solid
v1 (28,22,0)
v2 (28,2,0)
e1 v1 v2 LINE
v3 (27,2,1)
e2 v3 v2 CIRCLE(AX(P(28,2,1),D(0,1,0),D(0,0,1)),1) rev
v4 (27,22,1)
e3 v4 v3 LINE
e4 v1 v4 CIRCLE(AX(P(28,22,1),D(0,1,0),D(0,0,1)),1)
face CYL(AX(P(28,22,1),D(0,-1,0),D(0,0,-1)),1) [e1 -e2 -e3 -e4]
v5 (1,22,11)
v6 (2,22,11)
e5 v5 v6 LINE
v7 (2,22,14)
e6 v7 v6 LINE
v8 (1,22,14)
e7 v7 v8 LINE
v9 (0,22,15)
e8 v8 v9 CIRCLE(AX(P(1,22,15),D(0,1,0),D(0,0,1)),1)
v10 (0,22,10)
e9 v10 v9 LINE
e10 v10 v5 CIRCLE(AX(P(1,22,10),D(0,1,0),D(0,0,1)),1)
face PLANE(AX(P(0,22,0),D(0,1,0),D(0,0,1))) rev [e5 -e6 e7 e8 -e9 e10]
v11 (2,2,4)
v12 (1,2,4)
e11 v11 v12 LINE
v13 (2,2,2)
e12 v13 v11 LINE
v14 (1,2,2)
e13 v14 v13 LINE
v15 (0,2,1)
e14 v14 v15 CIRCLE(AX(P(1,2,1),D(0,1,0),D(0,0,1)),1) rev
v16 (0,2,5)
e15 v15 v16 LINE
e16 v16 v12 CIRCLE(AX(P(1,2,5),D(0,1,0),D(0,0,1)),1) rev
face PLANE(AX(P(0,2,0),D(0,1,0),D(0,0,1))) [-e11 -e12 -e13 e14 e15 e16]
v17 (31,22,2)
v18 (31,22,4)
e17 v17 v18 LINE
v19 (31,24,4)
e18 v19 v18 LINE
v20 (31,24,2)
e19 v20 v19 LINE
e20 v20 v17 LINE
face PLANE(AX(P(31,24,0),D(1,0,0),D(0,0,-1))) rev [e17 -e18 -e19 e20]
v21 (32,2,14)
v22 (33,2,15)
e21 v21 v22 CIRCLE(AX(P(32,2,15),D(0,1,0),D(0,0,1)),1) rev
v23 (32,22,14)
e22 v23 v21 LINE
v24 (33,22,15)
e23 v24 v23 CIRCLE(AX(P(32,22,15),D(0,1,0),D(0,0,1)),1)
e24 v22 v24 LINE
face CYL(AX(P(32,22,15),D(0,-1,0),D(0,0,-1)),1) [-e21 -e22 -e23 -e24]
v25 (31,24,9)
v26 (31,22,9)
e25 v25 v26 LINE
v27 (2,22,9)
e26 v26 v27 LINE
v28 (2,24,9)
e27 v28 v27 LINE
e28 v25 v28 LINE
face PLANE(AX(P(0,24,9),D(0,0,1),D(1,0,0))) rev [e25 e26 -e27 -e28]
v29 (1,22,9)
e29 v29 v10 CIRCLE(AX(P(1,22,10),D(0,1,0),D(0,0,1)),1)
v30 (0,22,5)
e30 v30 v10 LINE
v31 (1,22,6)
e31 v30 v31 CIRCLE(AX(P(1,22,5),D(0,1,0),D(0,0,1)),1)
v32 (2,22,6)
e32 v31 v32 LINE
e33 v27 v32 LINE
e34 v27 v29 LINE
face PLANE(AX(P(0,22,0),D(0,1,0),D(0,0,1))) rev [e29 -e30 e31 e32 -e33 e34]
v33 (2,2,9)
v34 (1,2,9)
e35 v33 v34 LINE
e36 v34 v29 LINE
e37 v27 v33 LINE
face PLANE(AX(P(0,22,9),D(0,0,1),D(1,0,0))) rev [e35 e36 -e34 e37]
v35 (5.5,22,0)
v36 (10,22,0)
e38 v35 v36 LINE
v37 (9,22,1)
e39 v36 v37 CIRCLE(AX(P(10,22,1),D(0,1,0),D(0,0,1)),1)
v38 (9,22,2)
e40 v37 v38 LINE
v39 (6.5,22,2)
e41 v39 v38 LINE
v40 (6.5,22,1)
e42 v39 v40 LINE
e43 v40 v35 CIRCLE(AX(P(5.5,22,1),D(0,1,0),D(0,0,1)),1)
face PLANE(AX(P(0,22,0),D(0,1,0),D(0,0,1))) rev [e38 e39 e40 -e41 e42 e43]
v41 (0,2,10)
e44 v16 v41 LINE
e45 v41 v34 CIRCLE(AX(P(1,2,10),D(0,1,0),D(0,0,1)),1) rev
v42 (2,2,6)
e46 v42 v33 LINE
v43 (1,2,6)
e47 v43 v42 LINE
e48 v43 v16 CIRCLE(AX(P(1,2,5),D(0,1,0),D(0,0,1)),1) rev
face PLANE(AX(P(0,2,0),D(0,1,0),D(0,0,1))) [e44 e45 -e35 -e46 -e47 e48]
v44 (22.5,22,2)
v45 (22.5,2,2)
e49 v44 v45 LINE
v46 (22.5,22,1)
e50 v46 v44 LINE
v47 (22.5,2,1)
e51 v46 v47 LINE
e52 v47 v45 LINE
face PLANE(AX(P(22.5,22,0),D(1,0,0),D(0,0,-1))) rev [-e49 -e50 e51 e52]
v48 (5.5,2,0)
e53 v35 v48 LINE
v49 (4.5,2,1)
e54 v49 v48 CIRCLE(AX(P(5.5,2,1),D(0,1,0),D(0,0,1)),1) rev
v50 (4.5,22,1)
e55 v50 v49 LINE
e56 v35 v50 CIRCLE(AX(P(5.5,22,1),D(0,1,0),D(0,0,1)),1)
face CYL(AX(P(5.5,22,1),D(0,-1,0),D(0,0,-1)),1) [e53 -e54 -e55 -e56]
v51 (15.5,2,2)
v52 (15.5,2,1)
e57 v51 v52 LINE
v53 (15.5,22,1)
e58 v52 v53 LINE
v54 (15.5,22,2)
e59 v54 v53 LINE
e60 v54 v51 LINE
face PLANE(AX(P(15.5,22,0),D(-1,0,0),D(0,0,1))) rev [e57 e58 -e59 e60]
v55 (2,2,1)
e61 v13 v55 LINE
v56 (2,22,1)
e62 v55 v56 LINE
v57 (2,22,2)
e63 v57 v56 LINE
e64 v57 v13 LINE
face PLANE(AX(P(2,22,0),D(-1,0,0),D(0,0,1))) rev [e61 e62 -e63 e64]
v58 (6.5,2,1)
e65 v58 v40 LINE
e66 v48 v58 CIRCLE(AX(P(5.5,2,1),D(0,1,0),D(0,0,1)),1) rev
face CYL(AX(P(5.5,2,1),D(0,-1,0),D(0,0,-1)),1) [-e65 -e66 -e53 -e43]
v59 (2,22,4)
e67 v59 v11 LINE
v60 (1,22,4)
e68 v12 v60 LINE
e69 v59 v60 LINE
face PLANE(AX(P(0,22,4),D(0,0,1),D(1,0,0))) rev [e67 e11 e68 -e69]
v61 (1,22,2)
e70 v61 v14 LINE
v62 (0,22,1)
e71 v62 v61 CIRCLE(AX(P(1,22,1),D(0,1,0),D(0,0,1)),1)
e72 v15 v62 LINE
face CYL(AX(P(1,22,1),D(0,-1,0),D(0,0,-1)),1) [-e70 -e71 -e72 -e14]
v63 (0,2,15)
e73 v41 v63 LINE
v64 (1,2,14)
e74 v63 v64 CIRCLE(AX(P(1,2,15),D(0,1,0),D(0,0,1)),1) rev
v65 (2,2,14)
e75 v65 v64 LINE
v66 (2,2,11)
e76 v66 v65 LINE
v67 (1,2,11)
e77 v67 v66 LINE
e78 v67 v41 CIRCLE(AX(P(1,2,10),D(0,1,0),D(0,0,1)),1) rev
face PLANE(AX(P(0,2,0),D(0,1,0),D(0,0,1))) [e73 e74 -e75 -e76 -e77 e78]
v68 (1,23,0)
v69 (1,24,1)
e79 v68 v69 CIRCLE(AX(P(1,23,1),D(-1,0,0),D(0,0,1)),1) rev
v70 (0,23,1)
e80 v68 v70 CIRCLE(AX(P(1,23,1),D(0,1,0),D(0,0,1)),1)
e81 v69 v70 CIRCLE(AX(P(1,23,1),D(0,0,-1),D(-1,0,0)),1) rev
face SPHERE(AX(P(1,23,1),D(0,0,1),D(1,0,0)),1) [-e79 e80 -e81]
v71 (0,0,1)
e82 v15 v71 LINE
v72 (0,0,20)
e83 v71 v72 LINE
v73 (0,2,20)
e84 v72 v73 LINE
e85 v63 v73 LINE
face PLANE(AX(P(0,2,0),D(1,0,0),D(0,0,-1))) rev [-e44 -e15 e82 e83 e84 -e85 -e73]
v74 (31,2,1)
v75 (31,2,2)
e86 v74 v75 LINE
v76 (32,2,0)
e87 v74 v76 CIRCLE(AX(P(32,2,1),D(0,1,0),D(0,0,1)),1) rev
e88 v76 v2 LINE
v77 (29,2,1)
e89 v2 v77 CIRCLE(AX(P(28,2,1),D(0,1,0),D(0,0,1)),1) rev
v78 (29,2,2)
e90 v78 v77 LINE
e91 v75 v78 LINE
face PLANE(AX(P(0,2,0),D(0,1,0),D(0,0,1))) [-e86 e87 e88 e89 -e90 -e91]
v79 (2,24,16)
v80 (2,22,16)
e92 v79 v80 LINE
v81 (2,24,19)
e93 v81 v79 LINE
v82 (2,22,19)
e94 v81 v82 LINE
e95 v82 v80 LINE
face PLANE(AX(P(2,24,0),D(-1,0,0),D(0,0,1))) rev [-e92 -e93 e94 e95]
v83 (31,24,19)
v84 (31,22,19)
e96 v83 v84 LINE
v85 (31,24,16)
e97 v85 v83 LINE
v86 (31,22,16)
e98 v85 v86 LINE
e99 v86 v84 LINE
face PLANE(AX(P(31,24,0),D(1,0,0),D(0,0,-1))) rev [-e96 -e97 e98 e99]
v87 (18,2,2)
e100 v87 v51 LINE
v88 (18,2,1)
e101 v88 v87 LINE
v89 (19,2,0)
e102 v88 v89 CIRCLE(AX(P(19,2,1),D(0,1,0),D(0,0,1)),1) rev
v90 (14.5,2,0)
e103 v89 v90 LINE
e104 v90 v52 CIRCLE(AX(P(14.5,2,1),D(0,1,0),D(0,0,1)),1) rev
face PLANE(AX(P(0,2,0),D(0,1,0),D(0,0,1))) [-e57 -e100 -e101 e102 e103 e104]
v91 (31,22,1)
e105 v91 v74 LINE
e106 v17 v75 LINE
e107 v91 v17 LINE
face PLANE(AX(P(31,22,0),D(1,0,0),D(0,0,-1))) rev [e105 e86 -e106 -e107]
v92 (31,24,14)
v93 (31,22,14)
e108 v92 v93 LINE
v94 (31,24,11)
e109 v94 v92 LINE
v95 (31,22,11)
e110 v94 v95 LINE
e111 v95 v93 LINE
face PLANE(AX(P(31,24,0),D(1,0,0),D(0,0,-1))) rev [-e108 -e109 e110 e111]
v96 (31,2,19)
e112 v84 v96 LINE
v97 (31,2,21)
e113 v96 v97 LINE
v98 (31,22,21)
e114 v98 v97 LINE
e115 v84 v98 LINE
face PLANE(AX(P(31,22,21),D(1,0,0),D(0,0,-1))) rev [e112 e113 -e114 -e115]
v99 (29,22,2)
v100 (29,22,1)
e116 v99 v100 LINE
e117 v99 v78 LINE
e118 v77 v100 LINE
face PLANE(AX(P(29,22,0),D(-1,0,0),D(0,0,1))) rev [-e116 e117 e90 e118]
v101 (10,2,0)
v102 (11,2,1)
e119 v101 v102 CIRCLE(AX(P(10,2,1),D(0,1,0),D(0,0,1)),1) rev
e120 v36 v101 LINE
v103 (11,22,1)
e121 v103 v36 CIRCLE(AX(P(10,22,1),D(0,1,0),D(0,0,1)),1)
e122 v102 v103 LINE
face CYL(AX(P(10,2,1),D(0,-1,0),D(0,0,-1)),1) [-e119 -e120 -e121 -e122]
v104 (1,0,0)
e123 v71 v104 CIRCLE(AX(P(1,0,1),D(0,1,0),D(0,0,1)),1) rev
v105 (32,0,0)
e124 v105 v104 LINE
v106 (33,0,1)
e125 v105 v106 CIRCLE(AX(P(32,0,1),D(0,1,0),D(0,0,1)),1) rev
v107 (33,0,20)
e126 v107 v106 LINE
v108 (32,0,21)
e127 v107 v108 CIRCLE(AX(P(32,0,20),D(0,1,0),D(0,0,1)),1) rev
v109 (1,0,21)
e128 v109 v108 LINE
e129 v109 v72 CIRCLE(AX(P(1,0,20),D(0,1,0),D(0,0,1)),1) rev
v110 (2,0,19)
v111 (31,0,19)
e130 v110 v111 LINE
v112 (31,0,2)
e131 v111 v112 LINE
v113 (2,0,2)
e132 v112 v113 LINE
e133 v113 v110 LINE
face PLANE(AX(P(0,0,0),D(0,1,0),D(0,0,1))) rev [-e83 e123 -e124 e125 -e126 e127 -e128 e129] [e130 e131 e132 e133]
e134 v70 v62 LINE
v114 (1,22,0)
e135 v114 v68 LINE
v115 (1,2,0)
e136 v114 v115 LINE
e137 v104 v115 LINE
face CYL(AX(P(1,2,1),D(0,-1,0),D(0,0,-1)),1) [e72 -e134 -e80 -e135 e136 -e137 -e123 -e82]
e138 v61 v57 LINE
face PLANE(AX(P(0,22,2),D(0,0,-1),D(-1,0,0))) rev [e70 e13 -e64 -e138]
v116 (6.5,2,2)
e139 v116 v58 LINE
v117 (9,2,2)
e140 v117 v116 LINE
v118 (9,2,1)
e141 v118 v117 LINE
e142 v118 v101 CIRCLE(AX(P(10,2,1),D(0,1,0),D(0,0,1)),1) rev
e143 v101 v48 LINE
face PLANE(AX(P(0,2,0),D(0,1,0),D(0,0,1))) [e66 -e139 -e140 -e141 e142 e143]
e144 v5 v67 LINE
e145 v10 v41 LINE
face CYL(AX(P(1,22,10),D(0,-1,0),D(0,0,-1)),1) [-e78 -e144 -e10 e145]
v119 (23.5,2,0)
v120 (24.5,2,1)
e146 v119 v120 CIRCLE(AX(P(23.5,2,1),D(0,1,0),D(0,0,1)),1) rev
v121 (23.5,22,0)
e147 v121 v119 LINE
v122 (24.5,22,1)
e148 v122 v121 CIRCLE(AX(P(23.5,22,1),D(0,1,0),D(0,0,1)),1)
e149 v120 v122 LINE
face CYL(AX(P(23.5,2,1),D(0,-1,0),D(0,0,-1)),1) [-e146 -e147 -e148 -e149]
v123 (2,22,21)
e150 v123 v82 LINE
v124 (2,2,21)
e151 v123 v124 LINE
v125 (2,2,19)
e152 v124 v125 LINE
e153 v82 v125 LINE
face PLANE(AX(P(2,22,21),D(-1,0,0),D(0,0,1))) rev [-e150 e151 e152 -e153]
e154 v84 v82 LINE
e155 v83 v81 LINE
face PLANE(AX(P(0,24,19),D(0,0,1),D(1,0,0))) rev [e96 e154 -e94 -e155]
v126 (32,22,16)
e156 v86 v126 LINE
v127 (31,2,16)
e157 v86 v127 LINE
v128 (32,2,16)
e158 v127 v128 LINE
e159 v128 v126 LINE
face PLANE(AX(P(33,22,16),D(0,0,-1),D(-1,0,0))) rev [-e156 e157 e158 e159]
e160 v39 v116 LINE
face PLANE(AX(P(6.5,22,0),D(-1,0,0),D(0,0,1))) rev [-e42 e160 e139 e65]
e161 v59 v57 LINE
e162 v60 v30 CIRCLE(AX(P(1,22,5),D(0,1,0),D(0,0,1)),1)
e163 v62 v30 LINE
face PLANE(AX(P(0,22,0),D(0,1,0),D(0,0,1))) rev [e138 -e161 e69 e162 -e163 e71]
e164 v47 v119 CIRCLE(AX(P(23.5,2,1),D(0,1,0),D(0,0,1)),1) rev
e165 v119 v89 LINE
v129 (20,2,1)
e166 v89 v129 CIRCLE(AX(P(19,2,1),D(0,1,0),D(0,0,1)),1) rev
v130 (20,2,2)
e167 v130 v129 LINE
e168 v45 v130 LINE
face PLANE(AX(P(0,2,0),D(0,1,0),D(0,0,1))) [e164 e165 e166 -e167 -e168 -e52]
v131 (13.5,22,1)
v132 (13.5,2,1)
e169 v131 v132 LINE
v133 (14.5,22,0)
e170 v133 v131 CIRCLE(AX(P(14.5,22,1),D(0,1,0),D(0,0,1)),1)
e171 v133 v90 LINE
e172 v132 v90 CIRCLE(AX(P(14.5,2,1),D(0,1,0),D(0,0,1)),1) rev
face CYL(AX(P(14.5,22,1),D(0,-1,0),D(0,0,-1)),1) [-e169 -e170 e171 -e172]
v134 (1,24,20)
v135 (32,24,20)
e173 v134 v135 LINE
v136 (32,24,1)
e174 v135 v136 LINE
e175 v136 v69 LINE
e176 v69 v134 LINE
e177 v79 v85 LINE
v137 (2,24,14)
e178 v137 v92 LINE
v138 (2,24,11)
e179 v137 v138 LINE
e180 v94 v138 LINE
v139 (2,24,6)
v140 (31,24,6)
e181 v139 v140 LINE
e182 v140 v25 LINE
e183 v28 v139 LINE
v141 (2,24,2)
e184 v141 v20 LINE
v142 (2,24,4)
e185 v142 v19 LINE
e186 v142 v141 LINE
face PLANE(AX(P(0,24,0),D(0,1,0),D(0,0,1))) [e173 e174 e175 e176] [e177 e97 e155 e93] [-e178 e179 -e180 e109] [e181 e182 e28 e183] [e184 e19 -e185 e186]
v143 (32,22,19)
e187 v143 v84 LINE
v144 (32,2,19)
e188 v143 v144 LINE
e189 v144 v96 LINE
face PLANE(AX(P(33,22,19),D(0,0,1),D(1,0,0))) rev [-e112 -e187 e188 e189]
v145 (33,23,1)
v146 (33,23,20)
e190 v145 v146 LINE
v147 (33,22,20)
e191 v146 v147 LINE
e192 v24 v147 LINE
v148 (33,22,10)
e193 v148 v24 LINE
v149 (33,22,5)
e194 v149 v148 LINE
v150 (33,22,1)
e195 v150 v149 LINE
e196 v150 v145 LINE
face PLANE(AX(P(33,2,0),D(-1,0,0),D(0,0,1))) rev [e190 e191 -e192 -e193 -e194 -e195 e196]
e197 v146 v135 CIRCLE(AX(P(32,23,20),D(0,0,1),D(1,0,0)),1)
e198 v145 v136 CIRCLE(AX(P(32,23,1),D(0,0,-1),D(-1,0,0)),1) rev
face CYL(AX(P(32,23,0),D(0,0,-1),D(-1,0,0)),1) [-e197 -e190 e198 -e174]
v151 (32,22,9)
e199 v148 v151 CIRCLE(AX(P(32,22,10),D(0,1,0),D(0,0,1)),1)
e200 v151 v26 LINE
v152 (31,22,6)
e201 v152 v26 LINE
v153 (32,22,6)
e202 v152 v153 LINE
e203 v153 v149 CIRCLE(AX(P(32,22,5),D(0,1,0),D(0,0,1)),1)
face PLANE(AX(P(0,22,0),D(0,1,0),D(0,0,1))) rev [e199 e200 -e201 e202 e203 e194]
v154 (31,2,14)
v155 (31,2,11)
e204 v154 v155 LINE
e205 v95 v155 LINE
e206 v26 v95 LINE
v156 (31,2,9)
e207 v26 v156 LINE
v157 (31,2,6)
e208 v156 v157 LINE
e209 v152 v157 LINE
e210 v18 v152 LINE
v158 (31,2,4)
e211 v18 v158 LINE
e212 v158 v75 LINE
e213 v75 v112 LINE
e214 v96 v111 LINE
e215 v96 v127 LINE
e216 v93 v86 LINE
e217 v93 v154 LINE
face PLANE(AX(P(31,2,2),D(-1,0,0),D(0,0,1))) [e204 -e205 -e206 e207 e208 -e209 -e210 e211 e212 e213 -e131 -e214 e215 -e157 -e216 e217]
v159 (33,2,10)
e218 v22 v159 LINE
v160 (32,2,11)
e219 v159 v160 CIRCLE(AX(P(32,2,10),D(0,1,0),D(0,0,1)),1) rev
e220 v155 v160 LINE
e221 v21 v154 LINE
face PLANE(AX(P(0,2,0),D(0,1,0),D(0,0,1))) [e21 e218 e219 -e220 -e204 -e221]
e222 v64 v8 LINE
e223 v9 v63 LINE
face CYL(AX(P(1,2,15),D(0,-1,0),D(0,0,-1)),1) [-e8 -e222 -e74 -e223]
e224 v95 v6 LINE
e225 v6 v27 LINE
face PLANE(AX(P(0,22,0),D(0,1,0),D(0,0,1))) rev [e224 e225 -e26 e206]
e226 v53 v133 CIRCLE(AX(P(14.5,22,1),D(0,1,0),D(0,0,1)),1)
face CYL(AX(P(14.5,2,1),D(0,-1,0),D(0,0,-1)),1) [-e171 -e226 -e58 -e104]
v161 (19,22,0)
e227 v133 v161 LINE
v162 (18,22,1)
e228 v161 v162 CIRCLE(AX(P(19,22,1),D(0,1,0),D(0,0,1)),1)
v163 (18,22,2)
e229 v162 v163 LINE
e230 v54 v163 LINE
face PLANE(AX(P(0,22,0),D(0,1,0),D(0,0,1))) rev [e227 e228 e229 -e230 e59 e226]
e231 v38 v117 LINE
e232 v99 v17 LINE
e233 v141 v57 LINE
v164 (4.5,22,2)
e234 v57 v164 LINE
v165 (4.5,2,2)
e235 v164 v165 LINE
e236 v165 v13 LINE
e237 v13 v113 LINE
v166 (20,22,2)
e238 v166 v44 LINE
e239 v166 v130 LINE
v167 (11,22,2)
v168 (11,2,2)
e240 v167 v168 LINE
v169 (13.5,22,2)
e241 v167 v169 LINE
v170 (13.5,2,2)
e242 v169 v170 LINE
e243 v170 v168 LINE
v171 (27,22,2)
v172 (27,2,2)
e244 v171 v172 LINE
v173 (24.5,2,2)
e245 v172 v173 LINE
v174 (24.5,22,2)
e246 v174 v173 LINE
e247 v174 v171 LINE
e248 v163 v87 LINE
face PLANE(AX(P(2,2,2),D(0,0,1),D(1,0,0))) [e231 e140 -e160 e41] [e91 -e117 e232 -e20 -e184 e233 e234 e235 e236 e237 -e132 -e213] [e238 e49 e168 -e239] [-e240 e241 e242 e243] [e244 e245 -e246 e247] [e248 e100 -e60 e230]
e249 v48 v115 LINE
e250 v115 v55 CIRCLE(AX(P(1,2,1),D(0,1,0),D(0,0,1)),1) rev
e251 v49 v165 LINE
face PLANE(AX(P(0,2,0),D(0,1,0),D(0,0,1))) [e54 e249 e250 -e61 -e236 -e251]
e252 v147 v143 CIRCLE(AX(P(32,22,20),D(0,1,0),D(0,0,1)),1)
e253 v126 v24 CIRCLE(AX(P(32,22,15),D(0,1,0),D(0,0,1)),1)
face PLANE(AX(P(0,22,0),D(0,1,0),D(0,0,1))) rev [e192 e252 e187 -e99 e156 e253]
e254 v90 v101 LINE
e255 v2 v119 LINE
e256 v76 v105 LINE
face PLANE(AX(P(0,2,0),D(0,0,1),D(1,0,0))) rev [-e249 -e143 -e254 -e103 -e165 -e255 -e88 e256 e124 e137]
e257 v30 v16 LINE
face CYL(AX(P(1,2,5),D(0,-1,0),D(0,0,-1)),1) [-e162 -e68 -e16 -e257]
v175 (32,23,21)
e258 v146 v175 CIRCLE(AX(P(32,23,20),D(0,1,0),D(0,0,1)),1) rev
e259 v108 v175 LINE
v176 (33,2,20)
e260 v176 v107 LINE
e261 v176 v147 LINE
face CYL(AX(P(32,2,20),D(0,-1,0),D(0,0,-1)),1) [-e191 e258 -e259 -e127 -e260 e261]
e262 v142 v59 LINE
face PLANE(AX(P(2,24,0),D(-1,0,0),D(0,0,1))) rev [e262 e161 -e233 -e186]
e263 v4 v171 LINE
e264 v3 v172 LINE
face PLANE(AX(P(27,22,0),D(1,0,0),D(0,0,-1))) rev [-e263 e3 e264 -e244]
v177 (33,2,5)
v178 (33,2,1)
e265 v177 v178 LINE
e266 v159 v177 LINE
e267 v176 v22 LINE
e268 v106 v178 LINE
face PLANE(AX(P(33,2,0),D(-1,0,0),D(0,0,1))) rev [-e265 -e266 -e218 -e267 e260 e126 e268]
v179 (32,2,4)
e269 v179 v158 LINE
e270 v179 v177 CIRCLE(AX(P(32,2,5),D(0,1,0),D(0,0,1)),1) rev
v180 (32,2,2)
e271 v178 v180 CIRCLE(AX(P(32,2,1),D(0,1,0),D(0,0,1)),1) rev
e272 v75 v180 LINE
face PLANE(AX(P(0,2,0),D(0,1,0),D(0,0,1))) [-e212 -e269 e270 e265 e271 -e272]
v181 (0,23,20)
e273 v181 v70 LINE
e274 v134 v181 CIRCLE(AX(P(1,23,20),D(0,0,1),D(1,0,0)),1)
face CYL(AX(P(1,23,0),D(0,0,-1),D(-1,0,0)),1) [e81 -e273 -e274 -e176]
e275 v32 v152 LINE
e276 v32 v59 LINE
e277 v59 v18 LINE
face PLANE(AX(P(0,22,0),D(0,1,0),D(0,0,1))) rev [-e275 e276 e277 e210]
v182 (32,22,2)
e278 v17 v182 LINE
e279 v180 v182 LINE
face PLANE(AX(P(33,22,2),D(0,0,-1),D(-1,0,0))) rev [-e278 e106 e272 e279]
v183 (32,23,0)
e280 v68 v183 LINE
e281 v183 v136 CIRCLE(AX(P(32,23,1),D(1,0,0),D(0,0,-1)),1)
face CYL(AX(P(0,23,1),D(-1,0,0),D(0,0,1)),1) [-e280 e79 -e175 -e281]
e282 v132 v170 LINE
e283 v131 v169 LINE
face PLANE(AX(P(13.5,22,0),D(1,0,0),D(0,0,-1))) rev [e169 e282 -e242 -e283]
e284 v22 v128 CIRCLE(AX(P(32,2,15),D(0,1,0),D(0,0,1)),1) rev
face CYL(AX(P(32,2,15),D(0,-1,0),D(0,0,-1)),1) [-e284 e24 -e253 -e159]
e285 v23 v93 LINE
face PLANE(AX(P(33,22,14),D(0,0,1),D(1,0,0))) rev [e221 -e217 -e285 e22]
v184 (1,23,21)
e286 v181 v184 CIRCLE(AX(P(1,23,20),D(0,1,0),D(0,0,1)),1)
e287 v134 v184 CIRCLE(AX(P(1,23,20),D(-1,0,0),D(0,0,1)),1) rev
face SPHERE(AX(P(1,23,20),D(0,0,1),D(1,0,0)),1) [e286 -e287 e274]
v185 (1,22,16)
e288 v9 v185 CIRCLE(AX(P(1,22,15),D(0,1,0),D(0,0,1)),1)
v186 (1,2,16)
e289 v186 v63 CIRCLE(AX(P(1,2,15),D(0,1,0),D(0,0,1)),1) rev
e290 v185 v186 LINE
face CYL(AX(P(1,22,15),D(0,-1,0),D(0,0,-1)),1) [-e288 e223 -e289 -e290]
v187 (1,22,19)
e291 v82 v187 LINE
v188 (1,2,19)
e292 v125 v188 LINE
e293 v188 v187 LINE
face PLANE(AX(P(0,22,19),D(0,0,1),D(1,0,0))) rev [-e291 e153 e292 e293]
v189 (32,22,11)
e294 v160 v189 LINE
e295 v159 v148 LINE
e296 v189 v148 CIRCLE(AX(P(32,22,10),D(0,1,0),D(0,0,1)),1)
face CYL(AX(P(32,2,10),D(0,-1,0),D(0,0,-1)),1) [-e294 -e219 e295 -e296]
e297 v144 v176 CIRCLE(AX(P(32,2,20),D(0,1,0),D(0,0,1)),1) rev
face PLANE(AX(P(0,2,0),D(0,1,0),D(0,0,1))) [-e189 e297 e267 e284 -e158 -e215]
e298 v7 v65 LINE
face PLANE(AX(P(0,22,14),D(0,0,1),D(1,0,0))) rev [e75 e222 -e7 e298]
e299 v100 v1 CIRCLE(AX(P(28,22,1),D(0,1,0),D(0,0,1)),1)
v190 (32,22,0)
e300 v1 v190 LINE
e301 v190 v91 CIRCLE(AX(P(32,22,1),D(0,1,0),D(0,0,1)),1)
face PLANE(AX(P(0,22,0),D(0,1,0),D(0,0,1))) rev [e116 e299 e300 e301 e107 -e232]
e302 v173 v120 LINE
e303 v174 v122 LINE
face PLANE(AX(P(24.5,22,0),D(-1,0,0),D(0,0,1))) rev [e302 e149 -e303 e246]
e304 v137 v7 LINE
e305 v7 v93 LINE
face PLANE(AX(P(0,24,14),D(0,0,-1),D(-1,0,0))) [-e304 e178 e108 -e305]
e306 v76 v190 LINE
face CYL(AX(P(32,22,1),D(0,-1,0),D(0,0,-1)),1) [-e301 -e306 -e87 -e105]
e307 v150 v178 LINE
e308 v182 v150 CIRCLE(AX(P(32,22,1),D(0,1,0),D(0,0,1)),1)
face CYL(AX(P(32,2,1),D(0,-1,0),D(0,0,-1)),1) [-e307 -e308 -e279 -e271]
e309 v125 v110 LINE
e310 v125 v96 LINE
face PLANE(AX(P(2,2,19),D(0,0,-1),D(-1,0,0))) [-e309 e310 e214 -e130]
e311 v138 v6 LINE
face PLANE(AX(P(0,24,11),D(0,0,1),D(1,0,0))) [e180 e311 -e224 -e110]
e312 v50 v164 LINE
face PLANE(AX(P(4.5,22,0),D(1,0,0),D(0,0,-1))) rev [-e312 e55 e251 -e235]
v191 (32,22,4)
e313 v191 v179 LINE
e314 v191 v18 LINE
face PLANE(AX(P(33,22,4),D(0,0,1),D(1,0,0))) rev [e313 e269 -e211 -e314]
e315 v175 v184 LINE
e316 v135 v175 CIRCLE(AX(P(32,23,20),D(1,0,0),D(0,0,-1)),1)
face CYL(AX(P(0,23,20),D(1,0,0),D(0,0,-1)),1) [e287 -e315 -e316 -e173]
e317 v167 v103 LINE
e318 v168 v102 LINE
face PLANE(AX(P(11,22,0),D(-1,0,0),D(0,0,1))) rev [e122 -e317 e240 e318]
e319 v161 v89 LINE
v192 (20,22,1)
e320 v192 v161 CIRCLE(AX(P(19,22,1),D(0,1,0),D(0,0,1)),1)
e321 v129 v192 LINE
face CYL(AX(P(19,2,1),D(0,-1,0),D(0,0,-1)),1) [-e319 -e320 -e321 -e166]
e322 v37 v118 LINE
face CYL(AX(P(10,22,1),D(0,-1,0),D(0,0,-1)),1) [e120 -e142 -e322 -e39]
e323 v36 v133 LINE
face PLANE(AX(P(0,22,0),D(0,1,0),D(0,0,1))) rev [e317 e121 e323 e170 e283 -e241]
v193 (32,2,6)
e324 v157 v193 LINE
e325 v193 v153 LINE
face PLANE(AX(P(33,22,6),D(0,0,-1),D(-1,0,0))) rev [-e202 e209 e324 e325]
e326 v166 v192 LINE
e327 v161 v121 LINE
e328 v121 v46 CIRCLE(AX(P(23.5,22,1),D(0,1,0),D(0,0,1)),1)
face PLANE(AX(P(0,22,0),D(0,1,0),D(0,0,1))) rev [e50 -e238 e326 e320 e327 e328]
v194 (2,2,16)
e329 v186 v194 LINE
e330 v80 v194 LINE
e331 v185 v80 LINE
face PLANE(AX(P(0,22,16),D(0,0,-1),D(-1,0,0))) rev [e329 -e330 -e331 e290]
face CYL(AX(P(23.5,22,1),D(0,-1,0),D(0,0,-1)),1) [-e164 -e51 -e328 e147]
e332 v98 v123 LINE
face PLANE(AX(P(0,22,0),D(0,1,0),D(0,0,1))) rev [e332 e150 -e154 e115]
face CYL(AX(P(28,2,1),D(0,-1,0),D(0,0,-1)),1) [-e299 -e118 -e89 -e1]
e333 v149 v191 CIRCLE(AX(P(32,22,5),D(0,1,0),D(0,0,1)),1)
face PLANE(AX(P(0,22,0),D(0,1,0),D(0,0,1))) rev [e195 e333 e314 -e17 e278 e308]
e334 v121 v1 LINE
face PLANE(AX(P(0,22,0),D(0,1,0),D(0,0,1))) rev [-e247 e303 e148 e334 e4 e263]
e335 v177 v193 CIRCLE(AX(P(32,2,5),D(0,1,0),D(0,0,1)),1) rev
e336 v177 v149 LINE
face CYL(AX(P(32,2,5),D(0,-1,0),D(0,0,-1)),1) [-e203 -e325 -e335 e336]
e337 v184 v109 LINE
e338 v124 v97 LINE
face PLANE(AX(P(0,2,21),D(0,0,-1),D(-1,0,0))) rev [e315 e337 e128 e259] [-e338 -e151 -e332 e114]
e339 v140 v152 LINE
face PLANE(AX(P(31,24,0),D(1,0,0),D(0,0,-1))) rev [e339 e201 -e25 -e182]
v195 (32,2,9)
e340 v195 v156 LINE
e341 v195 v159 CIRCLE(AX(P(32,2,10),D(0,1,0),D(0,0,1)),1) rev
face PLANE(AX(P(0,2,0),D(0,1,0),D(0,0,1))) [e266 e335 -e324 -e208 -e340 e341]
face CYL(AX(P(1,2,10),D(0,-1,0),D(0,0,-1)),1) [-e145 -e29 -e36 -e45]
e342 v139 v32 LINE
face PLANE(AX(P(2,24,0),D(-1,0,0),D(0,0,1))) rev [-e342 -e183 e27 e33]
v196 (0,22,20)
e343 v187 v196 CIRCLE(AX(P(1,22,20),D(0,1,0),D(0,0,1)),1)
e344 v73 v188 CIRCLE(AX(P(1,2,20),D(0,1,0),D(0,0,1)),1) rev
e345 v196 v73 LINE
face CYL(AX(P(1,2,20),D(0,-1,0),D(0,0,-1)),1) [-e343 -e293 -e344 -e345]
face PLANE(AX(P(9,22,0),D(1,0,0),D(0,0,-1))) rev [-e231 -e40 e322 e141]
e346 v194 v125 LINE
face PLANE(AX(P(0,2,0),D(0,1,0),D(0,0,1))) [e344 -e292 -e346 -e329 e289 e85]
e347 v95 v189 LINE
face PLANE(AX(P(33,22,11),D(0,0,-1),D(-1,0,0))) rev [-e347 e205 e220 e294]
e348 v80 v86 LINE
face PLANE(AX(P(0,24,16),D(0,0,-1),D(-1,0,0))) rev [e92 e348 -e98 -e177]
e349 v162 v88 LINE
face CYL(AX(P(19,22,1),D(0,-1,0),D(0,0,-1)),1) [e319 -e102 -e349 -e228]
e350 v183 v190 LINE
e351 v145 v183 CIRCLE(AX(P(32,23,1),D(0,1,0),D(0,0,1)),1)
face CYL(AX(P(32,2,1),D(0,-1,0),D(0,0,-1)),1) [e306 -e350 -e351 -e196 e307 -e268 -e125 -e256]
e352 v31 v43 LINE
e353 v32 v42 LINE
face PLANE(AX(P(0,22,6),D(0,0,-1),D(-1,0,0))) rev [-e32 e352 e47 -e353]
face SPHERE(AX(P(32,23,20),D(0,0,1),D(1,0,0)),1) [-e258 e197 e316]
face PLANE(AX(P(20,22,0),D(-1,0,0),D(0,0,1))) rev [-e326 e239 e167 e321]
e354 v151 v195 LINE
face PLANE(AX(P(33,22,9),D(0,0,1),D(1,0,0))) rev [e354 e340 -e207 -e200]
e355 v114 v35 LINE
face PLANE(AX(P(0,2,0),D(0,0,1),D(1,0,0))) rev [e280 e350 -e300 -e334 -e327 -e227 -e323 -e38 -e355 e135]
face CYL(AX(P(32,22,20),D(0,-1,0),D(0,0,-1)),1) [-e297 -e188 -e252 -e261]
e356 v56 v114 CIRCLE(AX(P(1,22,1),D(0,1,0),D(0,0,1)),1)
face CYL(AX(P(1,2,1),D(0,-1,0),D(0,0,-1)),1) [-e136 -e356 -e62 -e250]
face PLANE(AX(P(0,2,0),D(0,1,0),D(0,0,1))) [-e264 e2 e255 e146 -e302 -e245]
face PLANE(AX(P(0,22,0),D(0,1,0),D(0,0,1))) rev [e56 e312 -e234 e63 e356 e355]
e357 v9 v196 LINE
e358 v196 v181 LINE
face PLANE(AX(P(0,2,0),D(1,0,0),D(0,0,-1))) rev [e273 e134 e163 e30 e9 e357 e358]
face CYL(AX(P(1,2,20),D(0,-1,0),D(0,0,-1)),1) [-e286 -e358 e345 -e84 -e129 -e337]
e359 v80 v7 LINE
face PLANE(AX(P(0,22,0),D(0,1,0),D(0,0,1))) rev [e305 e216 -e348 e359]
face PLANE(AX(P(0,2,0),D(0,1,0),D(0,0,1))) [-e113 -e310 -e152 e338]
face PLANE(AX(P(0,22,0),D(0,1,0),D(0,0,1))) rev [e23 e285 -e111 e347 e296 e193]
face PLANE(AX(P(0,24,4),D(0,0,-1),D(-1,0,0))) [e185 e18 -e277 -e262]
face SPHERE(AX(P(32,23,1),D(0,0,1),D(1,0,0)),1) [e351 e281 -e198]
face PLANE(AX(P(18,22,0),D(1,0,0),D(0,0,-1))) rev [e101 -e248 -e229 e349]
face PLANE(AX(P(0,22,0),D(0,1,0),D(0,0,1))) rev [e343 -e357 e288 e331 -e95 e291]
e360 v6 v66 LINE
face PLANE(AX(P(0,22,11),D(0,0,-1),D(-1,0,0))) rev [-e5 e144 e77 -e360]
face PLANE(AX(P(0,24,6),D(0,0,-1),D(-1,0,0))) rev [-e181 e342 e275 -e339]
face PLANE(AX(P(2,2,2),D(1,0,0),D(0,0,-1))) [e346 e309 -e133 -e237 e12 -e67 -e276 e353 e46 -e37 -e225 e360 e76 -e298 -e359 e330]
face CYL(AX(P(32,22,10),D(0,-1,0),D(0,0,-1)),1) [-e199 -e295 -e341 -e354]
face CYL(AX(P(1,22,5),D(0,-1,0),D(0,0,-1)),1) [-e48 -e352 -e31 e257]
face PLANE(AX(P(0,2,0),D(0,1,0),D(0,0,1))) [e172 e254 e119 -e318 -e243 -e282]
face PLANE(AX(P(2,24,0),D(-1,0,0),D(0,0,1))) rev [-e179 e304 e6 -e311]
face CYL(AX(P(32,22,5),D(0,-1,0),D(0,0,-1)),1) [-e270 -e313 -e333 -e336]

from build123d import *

# Parameters (mm, degrees)
SKETCH_1_W      = 33
SKETCH_1_H      = 21
SKETCH_1_W_2    = 29
SKETCH_1_H_2    = 17
EXTRUDE_1_DEPTH = 2
SKETCH_2_W      = 2
SKETCH_2_H      = 2
EXTRUDE_2_DEPTH = 20
SKETCH_3_W      = 33
SKETCH_3_H      = 21
SKETCH_3_W_2    = 29
SKETCH_3_H_2    = 2
SKETCH_3_H_3    = 3
EXTRUDE_6_DEPTH = 2
FILLET_2_R      = 1


with BuildPart() as part:
    # 草图1 → 凸台-拉伸1 (new body)
    with BuildSketch(Plane(origin=(0, 0, 0), x_dir=(1, 0, 0), z_dir=(0, 1, 0))):
        with Locations((16.5, -10.5)):
            Rectangle(SKETCH_1_W, SKETCH_1_H)
        with Locations((16.5, -10.5)):
            Rectangle(SKETCH_1_W_2, SKETCH_1_H_2, mode=Mode.SUBTRACT)
    extrude(amount=EXTRUDE_1_DEPTH)

    # 草图2 → 凸台-拉伸2 (add)
    with BuildSketch(Plane(origin=(0, 2, 0), x_dir=(1, 0, 0), z_dir=(0, 1, 0))):
        with Locations((1, -15)):
            Rectangle(SKETCH_2_W, SKETCH_2_H)
        with Locations((1, -20)):
            Rectangle(SKETCH_2_W, SKETCH_2_H)
        with Locations((1, -1)):
            Rectangle(SKETCH_2_W, SKETCH_2_H)
        with Locations((32, -1)):
            Rectangle(SKETCH_2_W, SKETCH_2_H)
        with Locations((32, -20)):
            Rectangle(SKETCH_2_W, SKETCH_2_H)
        with Locations((32, -15)):
            Rectangle(SKETCH_2_W, SKETCH_2_H)
        with Locations((1, -10)):
            Rectangle(SKETCH_2_W, SKETCH_2_H)
        with Locations((32, -10)):
            Rectangle(SKETCH_2_W, SKETCH_2_H)
        with Locations((1, -5)):
            Rectangle(SKETCH_2_W, SKETCH_2_H)
        with Locations((32, -5)):
            Rectangle(SKETCH_2_W, SKETCH_2_H)
        with Locations((5.5, -1)):
            Rectangle(SKETCH_2_W, SKETCH_2_H)
        with Locations((10, -1)):
            Rectangle(SKETCH_2_W, SKETCH_2_H)
        with Locations((14.5, -1)):
            Rectangle(SKETCH_2_W, SKETCH_2_H)
        with Locations((19, -1)):
            Rectangle(SKETCH_2_W, SKETCH_2_H)
        with Locations((23.5, -1)):
            Rectangle(SKETCH_2_W, SKETCH_2_H)
        with Locations((28, -1)):
            Rectangle(SKETCH_2_W, SKETCH_2_H)
    extrude(amount=EXTRUDE_2_DEPTH)

    # 草图3 → 凸台-拉伸6 (add)
    with BuildSketch(Plane(origin=(0, 22, 0), x_dir=(1, 0, 0), z_dir=(0, 1, 0))):
        with Locations((16.5, -10.5)):
            Rectangle(SKETCH_3_W, SKETCH_3_H)
        with Locations((16.5, -3)):
            Rectangle(SKETCH_3_W_2, SKETCH_3_H_2, mode=Mode.SUBTRACT)
        with Locations((16.5, -7.5)):
            Rectangle(SKETCH_3_W_2, SKETCH_3_H_3, mode=Mode.SUBTRACT)
        with Locations((16.5, -12.5)):
            Rectangle(SKETCH_3_W_2, SKETCH_3_H_3, mode=Mode.SUBTRACT)
        with Locations((16.5, -17.5)):
            Rectangle(SKETCH_3_W_2, SKETCH_3_H_3, mode=Mode.SUBTRACT)
    extrude(amount=EXTRUDE_6_DEPTH)

    # 圆角2
    fillet_2_edges = [part.edges().sort_by_distance(p)[0] for p in [
        (33, 12, 11),
        (33, 12, 9),
        (0, 12, 4),
        (0, 12, 6),
        (33, 12, 6),
        (33, 12, 4),
        (6.5, 12, 0),
        (4.5, 12, 0),
        (11, 12, 0),
        (9, 12, 0),
        (15.5, 12, 0),
        (13.5, 12, 0),
        (20, 12, 0),
        (18, 12, 0),
        (24.5, 12, 0),
        (22.5, 12, 0),
        (29, 12, 0),
        (27, 12, 0),
        (33, 24, 10.5),
        (16.5, 24, 0),
        (16.5, 24, 21),
        (0, 24, 10.5),
        (0, 12, 19),
        (0, 12, 2),
        (2, 12, 0),
        (33, 12, 2),
        (31, 12, 0),
        (33, 12, 19),
        (0, 12, 14),
        (0, 12, 16),
        (0, 12, 0),
        (33, 12, 0),
        (33, 12, 21),
        (0, 12, 21),
        (33, 12, 16),
        (33, 12, 14),
        (0, 12, 9),
        (0, 12, 11),
    ]]
    fillet(fillet_2_edges, radius=FILLET_2_R - 0.0001)  # a hair under: the kernel refuses the full size


solid = part.part
